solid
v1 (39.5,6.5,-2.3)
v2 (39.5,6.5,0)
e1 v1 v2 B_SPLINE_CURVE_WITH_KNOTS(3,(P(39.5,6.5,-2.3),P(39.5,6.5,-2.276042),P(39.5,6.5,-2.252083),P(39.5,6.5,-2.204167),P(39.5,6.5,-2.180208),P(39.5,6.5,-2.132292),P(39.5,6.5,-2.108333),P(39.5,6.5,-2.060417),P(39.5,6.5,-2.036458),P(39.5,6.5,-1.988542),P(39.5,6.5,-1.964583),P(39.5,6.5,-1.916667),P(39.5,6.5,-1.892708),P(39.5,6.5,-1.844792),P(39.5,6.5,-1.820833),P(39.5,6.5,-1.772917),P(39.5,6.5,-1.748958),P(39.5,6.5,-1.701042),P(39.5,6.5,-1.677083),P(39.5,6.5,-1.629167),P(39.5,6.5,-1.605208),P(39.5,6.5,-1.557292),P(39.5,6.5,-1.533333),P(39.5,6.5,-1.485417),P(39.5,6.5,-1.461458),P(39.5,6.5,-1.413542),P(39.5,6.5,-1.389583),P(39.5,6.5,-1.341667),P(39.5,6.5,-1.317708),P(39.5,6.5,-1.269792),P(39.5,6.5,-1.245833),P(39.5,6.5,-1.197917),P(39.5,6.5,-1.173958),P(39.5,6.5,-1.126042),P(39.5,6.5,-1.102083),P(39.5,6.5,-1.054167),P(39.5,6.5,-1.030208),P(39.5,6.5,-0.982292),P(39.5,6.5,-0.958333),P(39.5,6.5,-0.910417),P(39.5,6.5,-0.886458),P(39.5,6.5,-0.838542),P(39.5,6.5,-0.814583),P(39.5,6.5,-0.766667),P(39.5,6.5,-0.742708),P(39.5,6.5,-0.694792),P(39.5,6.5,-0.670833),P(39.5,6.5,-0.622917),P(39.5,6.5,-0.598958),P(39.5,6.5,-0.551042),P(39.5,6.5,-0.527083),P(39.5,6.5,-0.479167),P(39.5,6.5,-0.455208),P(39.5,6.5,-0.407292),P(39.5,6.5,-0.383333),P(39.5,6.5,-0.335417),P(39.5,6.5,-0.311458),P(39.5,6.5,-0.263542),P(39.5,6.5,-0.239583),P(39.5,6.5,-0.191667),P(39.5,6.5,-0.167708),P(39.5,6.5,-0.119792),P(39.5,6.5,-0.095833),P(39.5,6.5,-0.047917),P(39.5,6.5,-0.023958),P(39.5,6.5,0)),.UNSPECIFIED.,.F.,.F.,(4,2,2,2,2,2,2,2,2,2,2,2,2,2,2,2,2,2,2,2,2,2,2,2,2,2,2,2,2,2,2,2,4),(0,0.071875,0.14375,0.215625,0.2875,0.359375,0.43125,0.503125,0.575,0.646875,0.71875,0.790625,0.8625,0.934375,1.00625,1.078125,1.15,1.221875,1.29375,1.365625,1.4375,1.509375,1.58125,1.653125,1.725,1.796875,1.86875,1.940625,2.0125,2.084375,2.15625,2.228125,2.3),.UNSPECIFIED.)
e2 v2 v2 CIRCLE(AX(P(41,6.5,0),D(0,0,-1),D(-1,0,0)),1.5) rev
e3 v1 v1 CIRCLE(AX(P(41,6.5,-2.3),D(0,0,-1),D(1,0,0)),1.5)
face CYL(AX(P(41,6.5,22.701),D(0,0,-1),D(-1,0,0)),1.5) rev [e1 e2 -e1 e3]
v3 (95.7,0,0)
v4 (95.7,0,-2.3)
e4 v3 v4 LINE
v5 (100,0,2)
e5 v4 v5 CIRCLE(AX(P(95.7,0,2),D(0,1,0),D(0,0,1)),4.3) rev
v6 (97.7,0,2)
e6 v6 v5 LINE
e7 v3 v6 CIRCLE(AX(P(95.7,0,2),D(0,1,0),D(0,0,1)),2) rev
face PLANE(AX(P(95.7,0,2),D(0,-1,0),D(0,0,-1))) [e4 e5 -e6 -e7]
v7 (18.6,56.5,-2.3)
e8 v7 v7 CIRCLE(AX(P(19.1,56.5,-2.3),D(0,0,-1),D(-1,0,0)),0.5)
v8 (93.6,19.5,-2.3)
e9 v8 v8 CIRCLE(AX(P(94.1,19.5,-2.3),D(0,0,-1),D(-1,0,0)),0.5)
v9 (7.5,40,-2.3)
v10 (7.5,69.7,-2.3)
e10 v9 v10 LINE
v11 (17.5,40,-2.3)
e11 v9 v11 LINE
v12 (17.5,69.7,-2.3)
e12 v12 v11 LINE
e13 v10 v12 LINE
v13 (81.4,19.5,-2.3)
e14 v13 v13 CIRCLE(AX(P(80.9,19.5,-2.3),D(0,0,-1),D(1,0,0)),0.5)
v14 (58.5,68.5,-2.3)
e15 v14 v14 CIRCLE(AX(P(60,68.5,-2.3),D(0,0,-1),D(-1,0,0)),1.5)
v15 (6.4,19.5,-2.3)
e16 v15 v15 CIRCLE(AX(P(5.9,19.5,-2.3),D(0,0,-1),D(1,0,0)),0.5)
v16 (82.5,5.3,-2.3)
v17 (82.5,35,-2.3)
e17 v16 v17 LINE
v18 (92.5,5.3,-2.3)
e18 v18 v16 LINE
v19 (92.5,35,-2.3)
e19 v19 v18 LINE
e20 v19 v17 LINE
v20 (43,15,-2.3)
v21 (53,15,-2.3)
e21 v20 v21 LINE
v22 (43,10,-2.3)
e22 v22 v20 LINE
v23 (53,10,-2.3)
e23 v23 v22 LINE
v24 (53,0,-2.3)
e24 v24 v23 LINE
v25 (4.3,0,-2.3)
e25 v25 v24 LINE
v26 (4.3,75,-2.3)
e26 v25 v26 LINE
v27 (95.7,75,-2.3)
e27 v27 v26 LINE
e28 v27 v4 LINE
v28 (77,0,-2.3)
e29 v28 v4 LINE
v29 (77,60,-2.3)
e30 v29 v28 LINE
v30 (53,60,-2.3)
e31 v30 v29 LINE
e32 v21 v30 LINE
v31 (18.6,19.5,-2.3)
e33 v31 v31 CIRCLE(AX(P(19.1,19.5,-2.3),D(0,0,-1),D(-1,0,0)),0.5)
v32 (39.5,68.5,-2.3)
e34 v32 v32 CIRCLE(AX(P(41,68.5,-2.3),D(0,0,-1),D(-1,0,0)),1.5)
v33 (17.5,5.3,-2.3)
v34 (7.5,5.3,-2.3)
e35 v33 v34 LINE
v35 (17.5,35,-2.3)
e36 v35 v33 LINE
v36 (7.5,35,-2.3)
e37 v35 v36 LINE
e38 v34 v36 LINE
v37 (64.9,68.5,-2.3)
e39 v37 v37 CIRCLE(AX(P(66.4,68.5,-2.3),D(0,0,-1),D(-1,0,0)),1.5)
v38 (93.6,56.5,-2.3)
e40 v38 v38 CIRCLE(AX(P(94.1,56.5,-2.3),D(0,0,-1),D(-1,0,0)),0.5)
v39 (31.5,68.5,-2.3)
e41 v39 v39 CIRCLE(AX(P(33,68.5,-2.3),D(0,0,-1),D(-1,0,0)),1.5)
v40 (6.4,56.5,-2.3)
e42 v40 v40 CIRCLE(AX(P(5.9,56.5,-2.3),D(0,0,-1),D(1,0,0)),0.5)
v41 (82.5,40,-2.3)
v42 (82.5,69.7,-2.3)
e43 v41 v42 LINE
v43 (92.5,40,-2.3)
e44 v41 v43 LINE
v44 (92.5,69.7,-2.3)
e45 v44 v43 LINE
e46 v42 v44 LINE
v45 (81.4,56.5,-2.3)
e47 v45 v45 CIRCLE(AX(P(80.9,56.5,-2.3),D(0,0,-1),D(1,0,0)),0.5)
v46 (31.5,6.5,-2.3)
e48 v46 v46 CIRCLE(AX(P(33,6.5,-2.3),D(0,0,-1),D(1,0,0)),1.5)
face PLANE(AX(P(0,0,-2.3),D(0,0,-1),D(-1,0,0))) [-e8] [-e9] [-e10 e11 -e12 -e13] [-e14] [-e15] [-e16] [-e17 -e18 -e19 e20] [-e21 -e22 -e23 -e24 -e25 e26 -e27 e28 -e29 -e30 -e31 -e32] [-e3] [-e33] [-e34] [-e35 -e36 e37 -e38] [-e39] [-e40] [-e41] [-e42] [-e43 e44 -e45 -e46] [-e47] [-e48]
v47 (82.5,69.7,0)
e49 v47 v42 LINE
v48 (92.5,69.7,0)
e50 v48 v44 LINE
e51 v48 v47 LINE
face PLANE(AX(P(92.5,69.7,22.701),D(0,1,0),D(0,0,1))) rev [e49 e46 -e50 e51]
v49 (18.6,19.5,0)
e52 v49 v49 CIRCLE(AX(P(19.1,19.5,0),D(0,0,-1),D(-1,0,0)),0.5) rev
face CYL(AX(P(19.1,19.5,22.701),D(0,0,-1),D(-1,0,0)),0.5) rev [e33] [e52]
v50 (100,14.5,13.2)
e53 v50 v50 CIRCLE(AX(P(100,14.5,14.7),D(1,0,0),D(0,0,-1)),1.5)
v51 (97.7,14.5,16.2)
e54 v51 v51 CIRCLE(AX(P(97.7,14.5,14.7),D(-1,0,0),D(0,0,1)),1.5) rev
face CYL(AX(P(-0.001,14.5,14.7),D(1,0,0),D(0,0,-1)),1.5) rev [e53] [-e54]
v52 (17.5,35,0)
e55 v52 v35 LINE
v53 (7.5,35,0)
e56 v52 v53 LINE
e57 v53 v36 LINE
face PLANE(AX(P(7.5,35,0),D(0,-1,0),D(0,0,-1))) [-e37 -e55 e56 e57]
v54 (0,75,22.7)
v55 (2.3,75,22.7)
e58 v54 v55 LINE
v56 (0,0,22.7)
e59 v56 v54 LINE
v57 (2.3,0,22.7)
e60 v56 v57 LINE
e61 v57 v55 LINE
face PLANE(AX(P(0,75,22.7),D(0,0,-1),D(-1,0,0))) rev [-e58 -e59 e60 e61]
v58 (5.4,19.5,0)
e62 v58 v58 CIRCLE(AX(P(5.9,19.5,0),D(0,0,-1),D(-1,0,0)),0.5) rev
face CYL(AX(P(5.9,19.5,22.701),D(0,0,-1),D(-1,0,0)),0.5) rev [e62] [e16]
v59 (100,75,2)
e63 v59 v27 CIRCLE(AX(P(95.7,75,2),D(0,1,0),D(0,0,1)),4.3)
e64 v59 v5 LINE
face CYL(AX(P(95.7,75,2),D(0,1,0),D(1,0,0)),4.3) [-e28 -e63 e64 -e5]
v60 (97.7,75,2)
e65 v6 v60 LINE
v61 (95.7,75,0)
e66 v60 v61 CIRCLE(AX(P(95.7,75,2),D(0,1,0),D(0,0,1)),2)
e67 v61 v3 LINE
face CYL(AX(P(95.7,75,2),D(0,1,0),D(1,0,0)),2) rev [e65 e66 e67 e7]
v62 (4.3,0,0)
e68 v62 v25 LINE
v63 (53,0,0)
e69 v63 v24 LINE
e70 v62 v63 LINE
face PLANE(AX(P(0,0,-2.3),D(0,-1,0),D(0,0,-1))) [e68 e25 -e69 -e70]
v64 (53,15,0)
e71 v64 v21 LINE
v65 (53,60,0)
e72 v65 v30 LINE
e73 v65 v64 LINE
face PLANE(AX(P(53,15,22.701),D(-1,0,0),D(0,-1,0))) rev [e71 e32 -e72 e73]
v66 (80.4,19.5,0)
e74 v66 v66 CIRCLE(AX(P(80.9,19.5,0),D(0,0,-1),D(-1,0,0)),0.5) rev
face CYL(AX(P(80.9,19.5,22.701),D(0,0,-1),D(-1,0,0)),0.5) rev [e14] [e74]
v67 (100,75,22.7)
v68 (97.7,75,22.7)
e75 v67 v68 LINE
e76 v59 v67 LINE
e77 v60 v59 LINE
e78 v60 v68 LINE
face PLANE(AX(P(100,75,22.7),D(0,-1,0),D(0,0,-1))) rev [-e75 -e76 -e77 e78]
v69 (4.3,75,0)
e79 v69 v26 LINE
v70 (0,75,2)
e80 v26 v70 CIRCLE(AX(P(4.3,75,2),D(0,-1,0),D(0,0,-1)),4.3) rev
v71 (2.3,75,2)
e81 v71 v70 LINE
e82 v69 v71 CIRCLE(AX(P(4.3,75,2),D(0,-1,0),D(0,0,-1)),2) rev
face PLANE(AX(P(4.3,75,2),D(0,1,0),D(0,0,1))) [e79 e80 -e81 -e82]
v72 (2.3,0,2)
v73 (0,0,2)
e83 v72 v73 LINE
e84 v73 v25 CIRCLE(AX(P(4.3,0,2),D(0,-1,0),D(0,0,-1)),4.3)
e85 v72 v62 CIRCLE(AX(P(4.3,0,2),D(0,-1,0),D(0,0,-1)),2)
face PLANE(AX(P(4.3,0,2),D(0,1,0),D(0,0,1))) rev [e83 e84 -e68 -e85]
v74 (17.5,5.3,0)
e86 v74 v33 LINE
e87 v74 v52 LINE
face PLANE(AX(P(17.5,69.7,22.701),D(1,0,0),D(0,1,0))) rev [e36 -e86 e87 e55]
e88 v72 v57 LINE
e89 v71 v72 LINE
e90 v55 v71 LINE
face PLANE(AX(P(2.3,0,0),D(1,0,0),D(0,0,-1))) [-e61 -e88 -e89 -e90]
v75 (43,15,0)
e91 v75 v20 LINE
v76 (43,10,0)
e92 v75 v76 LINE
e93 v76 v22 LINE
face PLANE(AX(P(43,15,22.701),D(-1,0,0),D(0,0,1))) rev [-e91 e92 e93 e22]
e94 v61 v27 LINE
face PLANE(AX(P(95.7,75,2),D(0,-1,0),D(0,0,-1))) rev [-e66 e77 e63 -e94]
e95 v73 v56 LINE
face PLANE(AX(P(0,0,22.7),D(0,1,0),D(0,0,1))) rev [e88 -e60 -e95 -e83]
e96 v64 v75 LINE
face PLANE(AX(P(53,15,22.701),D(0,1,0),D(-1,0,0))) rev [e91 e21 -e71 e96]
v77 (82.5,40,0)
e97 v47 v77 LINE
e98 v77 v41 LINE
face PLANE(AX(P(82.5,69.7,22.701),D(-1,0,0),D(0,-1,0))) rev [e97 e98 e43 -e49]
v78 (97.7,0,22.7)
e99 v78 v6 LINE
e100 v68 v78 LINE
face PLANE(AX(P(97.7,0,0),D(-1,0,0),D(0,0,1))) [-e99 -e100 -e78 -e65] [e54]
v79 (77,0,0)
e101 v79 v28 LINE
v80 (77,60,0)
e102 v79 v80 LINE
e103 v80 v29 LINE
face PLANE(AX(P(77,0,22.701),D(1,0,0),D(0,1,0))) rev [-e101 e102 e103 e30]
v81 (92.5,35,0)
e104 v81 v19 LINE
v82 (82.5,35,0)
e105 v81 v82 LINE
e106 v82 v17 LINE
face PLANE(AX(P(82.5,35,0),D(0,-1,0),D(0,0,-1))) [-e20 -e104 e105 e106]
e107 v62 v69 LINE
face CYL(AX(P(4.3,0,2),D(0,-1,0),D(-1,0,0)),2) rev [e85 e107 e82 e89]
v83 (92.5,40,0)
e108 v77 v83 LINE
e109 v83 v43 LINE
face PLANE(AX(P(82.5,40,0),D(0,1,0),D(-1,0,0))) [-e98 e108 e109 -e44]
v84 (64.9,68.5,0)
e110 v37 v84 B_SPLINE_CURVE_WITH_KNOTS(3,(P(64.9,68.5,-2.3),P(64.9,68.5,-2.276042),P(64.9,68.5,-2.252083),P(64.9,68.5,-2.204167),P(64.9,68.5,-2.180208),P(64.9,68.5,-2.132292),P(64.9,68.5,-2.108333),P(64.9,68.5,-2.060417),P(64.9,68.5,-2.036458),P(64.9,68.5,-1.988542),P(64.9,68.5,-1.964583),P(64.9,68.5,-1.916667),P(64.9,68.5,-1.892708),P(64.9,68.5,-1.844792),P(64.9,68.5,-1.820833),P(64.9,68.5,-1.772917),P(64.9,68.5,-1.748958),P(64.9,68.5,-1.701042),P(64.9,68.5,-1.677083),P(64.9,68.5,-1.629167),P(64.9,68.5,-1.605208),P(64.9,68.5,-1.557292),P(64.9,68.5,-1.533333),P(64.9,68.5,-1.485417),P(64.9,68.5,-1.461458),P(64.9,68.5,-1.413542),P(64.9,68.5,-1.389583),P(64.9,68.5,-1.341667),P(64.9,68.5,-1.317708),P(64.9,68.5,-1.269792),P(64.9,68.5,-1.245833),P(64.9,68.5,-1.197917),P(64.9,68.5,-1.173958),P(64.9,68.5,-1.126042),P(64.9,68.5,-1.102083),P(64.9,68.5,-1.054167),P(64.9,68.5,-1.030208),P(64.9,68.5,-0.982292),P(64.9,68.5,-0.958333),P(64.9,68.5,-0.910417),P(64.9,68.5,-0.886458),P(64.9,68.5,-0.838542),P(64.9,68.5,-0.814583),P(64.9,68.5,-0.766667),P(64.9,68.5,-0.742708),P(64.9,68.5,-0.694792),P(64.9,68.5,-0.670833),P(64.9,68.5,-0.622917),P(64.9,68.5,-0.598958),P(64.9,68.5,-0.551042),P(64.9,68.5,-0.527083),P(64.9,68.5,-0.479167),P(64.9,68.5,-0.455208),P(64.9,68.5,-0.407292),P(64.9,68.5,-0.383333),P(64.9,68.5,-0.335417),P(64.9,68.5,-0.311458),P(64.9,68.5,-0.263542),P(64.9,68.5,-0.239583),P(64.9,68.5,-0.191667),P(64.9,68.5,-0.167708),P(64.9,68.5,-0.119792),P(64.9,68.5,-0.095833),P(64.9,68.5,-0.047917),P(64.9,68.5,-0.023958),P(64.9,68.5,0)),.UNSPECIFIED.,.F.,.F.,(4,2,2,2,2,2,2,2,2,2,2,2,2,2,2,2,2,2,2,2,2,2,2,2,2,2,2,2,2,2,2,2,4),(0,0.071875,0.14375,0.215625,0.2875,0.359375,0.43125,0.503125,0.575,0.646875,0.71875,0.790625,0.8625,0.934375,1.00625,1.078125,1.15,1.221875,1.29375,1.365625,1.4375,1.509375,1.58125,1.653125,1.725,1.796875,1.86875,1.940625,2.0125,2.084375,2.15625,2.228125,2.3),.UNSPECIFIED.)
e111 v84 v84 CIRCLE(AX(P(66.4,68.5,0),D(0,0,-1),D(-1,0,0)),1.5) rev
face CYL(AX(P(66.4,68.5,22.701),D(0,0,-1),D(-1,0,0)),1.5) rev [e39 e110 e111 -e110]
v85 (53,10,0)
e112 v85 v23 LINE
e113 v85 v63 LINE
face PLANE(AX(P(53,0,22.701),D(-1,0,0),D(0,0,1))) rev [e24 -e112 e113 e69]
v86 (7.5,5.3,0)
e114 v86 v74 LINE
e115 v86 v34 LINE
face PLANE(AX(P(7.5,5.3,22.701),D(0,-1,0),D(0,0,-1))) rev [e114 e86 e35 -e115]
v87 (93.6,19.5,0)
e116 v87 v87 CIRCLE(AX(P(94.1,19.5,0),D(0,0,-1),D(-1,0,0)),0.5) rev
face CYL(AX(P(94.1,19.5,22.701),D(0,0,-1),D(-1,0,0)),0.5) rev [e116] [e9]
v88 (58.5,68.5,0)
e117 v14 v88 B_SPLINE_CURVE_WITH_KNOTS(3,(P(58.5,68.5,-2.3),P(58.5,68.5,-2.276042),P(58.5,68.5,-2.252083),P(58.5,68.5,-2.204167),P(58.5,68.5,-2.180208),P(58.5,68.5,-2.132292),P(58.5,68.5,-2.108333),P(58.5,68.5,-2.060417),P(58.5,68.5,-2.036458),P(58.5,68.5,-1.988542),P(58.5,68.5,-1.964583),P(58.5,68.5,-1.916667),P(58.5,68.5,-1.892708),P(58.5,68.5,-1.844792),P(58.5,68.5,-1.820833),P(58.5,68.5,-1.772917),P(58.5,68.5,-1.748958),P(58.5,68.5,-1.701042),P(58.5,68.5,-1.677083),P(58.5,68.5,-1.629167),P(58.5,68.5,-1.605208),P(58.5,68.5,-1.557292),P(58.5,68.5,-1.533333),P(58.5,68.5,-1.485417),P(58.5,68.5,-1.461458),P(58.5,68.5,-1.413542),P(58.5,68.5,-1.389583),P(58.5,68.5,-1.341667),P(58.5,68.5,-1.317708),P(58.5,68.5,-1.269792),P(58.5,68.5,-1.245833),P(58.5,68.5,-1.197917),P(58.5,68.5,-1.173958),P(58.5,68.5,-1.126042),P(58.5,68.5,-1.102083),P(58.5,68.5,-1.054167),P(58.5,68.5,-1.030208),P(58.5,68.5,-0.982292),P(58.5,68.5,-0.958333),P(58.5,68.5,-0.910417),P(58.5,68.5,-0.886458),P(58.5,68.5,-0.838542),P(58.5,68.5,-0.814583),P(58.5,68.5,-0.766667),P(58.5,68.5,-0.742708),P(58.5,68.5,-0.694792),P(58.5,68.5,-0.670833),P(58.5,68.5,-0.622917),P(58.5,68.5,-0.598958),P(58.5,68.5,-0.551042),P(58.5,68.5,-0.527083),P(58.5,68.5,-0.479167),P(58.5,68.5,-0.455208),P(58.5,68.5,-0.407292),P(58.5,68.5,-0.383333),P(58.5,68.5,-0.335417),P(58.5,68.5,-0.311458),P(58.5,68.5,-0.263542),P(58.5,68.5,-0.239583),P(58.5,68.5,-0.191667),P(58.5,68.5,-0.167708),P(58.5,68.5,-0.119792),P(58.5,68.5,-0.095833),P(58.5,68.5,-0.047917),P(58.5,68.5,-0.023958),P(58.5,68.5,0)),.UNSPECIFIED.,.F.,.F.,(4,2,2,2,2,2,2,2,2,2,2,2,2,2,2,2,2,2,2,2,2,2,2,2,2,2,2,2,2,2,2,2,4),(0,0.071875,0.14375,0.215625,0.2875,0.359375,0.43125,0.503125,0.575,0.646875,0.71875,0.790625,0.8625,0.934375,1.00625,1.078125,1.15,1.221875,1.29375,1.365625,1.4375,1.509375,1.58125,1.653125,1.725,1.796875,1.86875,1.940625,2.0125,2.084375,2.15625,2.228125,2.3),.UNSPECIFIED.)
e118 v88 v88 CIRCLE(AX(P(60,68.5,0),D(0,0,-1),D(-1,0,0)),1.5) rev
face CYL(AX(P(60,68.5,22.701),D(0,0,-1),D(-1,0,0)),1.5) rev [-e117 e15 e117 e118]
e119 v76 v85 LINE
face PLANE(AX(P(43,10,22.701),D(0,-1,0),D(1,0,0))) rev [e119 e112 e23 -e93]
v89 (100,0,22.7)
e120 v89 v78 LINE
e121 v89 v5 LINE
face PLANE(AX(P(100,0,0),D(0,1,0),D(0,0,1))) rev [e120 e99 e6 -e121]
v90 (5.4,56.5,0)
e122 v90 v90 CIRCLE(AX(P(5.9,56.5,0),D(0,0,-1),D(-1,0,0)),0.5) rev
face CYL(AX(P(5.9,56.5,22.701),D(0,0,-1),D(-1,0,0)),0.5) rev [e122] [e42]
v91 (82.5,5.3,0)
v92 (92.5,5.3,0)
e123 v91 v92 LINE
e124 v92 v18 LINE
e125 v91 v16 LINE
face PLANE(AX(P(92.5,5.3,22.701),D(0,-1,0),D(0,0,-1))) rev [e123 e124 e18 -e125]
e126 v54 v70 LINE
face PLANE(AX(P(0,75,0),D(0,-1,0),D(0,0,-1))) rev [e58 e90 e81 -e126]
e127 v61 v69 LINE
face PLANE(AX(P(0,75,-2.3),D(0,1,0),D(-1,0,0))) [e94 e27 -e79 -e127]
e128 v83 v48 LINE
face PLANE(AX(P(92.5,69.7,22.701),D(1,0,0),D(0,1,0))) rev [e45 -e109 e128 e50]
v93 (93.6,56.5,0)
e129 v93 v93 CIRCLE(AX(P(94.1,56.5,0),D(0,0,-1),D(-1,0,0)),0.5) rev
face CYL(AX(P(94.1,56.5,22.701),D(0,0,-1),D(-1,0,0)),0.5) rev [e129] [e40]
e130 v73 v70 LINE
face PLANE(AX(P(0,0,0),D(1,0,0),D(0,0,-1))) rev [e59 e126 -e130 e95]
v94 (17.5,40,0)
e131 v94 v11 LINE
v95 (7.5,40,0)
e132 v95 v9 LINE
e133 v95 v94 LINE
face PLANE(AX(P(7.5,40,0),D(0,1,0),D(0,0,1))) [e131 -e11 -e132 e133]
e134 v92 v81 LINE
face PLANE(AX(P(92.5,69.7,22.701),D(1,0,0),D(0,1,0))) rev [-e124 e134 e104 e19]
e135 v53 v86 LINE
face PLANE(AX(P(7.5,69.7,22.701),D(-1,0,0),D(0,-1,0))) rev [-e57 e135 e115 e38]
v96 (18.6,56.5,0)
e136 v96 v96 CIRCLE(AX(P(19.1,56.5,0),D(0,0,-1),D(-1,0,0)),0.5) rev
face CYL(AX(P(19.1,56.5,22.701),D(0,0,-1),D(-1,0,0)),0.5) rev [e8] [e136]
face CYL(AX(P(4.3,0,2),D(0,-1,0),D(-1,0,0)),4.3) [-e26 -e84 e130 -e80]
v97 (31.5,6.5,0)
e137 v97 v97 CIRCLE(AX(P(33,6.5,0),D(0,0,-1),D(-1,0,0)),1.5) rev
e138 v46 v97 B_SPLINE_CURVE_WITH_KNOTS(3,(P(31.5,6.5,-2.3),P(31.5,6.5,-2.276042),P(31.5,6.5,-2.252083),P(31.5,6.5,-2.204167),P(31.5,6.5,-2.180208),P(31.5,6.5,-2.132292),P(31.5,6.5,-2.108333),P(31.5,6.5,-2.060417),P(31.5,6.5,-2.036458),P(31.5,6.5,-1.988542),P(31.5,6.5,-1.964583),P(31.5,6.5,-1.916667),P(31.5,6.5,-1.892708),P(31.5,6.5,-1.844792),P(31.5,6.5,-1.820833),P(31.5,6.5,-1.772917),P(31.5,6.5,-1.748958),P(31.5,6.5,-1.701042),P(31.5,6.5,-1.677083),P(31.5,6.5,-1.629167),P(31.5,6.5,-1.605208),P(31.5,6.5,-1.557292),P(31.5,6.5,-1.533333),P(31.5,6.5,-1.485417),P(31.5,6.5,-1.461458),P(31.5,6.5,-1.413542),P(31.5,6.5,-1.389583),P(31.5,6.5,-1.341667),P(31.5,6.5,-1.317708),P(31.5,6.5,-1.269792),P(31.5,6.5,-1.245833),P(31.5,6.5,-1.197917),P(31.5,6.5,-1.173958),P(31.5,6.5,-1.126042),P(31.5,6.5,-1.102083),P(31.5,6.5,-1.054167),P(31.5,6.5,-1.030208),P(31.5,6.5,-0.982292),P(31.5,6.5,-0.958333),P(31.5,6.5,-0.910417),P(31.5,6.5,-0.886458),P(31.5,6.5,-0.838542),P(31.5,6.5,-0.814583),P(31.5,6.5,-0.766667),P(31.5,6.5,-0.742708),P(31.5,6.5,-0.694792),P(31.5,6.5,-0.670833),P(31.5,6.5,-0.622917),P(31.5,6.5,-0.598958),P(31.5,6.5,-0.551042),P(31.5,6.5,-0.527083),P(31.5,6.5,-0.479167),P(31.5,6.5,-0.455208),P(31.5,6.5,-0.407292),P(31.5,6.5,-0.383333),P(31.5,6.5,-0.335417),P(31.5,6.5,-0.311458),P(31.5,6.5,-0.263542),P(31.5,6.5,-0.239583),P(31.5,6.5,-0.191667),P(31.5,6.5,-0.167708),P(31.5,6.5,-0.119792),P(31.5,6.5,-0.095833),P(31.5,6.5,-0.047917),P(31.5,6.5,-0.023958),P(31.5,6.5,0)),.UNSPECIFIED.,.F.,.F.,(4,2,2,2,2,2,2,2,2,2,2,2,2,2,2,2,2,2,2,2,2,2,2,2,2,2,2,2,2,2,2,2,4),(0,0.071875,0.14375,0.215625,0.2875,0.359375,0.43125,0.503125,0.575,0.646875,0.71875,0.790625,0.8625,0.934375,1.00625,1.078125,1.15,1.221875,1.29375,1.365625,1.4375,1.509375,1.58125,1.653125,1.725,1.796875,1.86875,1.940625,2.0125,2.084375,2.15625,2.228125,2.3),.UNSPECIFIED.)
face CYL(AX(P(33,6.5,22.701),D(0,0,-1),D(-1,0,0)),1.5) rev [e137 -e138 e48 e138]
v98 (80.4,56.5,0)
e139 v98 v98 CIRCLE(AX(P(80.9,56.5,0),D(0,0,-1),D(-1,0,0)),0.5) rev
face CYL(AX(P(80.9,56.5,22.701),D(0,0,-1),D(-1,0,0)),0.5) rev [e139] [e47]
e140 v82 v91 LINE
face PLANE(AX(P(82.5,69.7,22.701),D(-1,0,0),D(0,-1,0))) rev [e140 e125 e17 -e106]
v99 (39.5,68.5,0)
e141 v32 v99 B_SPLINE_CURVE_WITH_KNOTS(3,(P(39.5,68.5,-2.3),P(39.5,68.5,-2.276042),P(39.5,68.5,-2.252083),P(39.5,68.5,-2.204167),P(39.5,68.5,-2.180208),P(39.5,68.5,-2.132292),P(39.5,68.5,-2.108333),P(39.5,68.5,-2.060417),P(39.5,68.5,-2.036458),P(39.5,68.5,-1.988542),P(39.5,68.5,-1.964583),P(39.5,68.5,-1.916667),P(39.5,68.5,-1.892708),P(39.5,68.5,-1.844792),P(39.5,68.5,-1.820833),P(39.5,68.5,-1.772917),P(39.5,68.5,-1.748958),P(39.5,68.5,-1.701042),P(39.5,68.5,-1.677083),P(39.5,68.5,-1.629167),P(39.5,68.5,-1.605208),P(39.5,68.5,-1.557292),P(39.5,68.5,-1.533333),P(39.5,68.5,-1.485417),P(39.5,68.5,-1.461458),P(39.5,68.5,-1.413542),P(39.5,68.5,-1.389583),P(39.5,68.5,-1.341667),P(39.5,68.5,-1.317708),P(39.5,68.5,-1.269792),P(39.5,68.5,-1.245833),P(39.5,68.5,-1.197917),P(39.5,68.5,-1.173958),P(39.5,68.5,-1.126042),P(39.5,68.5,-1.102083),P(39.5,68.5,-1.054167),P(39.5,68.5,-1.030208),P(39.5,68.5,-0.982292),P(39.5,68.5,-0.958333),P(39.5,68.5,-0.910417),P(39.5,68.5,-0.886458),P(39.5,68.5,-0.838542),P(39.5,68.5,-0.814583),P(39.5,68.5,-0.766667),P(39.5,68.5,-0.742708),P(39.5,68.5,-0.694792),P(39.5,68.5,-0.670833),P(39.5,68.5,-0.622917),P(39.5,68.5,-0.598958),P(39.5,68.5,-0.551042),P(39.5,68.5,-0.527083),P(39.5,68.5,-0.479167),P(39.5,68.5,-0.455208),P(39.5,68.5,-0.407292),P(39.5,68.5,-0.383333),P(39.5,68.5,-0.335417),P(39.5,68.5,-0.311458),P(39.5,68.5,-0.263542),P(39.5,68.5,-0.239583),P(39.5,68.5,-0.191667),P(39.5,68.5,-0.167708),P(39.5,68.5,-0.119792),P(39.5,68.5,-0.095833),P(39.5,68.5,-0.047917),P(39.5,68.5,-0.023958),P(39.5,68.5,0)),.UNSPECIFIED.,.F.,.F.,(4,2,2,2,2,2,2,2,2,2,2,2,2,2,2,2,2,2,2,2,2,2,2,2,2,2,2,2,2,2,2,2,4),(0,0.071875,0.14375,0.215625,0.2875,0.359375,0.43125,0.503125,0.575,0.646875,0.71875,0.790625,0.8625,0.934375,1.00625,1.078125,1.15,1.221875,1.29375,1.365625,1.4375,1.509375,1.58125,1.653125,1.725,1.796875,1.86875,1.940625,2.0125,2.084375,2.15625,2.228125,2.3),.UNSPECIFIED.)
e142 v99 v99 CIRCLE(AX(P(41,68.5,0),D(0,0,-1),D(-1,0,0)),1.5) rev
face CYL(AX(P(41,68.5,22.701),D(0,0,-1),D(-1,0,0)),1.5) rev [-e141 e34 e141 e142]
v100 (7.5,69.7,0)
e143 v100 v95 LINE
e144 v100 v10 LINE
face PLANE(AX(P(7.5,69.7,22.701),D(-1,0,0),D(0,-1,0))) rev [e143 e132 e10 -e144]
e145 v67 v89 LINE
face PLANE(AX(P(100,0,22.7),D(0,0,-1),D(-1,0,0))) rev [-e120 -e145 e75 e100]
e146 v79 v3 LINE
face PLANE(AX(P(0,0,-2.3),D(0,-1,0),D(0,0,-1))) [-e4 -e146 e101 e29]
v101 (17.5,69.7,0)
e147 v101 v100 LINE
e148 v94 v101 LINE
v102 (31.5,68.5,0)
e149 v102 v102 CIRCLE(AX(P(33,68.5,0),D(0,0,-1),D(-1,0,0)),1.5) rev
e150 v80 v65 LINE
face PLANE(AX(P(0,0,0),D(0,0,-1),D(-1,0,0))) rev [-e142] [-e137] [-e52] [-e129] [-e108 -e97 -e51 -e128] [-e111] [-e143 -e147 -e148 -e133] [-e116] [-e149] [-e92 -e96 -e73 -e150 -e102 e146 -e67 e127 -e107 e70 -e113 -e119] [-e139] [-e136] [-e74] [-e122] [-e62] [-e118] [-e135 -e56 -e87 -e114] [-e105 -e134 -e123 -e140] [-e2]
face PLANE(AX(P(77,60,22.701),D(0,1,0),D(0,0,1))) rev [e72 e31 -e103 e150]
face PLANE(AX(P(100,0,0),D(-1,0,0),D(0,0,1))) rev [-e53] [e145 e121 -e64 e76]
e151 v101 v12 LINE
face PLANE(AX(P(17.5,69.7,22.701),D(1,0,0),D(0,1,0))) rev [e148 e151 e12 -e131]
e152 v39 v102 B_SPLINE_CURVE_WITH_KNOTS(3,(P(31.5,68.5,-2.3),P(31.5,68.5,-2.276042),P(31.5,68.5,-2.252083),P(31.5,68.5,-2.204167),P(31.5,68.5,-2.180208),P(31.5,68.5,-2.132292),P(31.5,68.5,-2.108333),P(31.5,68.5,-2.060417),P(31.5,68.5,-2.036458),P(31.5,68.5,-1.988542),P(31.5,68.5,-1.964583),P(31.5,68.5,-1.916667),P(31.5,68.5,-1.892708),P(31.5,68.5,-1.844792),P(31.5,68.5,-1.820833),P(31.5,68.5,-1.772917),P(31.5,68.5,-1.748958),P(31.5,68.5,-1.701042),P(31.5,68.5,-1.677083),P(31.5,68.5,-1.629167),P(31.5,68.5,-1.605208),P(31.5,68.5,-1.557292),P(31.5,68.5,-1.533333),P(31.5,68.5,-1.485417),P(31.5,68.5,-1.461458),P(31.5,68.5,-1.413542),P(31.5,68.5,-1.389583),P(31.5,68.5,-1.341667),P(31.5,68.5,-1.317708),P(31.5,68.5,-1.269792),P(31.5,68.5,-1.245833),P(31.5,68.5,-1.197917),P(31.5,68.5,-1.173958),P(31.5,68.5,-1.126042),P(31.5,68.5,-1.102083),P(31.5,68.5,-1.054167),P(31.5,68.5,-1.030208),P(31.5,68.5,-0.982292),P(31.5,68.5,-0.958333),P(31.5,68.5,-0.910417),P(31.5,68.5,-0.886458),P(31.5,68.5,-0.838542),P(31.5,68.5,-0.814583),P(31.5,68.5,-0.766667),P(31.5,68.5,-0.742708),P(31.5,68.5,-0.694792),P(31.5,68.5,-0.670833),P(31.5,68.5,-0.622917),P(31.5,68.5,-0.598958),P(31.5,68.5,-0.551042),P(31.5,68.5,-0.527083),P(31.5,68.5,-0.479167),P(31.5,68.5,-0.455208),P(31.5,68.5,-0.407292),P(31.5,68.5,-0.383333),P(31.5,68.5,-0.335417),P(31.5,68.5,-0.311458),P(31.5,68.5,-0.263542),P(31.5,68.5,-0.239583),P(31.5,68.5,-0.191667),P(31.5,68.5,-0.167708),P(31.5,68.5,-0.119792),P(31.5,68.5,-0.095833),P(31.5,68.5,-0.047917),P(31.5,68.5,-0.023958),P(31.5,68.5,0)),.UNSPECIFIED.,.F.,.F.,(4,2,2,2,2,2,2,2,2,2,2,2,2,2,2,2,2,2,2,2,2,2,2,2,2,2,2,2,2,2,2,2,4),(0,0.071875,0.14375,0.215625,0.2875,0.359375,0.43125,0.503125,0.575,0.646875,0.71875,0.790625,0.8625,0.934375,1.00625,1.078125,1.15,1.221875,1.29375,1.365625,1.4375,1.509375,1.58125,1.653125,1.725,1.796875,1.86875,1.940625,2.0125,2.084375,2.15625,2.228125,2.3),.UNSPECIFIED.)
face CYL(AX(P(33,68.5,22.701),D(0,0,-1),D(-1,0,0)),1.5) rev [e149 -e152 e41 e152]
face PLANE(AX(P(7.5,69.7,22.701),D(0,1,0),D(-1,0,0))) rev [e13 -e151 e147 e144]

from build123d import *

# Parameters (mm, degrees)
SKETCH2_W                    = 100
SKETCH2_H                    = 75
BASE_FLANGE1_DEPTH           = 2.3
EDGE_FLANGE1_STRIP_W         = 13.2
EDGE_FLANGE1_STRIP_H         = 2.3
EDGE_FLANGE1_STRIP_CUT_DEPTH = 75
EDGE_FLANGE1_DEPTH           = 75
EDGE_FLANGE2_STRIP_W         = 13.2
EDGE_FLANGE2_STRIP_H         = 2.3
EDGE_FLANGE2_STRIP_CUT_DEPTH = 75
EDGE_FLANGE2_DEPTH           = 75
CUT_EXTRUDE1_REACH           = 129.475
SKETCH13_R                   = 1.5
SKETCH13_W                   = 10
SKETCH13_H                   = 64.4
SKETCH14_W                   = 10
SKETCH14_H                   = 5
TAB1_DEPTH                   = 2.3
CUT_EXTRUDE2_REACH           = 129.475
SKETCH17_R                   = 0.5
CUT_EXTRUDE3_REACH           = 129.044
SKETCH18_R                   = 1.5


# Sheet-metal steps are written as plain solids
with BuildPart() as part:
    # Sketch2 → Base-Flange1 (new body)
    with BuildSketch(Plane.XY):
        with Locations((50, 37.5)):
            Rectangle(SKETCH2_W, SKETCH2_H)
    extrude(amount=-BASE_FLANGE1_DEPTH)

    # Edge-Flange1 strip (across the edge) → Edge-Flange1 strip cut (cut)
    with BuildSketch(Plane.XZ.offset(-75)):
        with Locations((-2.3, -1.15)):
            Rectangle(EDGE_FLANGE1_STRIP_W, EDGE_FLANGE1_STRIP_H)
    extrude(amount=EDGE_FLANGE1_STRIP_CUT_DEPTH, mode=Mode.SUBTRACT)

    # Edge-Flange1 section (across the edge) → Edge-Flange1 (add)
    with BuildSketch(Plane.XZ.offset(-75)):
        with BuildLine():
            Line((0, 2), (0, 22.7))
            Line((0, 22.7), (2.3, 22.7))
            Line((2.3, 22.7), (2.3, 2))
            ThreePointArc((2.3, 2), (2.885786438, 0.585786438), (4.3, 0))
            Line((4.3, 0), (4.3, -2.3))
            ThreePointArc((4.3, -2.3), (1.259440841, -1.040559159), (0, 2))
        make_face()
    extrude(amount=EDGE_FLANGE1_DEPTH)

    # Edge-Flange2 strip (across the edge) → Edge-Flange2 strip cut (cut)
    with BuildSketch(Plane(origin=(100, 0, 0), x_dir=(-1, 0, 0), z_dir=(0, 1, 0))):
        with Locations((-2.3, -1.15)):
            Rectangle(EDGE_FLANGE2_STRIP_W, EDGE_FLANGE2_STRIP_H)
    extrude(amount=EDGE_FLANGE2_STRIP_CUT_DEPTH, mode=Mode.SUBTRACT)

    # Edge-Flange2 section (across the edge) → Edge-Flange2 (add)
    with BuildSketch(Plane(origin=(100, 0, 0), x_dir=(-1, 0, 0), z_dir=(0, 1, 0))):
        with BuildLine():
            Line((0, 2), (0, 22.7))
            Line((0, 22.7), (2.3, 22.7))
            Line((2.3, 22.7), (2.3, 2))
            ThreePointArc((2.3, 2), (2.885786438, 0.585786438), (4.3, 0))
            Line((4.3, 0), (4.3, -2.3))
            ThreePointArc((4.3, -2.3), (1.259440841, -1.040559159), (0, 2))
        make_face()
    extrude(amount=EDGE_FLANGE2_DEPTH)

    # Sketch13 → Cut-Extrude1 (cut, up to next)
    with BuildSketch(Plane(origin=(0, 0, -2.3), x_dir=(-1, 0, 0), z_dir=(0, 0, -1)), mode=Mode.PRIVATE) as cut_extrude1_sk1:
        with Locations((-66.4, 68.5)):
            Circle(SKETCH13_R)
    cut_extrude1_tool1 = extrude(cut_extrude1_sk1.sketch, amount=-CUT_EXTRUDE1_REACH, mode=Mode.PRIVATE) & part.part
    # Sketch13 → Cut-Extrude1 (cut, up to next)
    with BuildSketch(Plane(origin=(0, 0, -2.3), x_dir=(-1, 0, 0), z_dir=(0, 0, -1)), mode=Mode.PRIVATE) as cut_extrude1_sk2:
        with Locations((-60, 68.5)):
            Circle(SKETCH13_R)
    cut_extrude1_tool2 = extrude(cut_extrude1_sk2.sketch, amount=-CUT_EXTRUDE1_REACH, mode=Mode.PRIVATE) & part.part
    # Sketch13 → Cut-Extrude1 (cut, up to next)
    with BuildSketch(Plane(origin=(0, 0, -2.3), x_dir=(-1, 0, 0), z_dir=(0, 0, -1)), mode=Mode.PRIVATE) as cut_extrude1_sk3:
        with Locations((-41, 68.5)):
            Circle(SKETCH13_R)
    cut_extrude1_tool3 = extrude(cut_extrude1_sk3.sketch, amount=-CUT_EXTRUDE1_REACH, mode=Mode.PRIVATE) & part.part
    # Sketch13 → Cut-Extrude1 (cut, up to next)
    with BuildSketch(Plane(origin=(0, 0, -2.3), x_dir=(-1, 0, 0), z_dir=(0, 0, -1)), mode=Mode.PRIVATE) as cut_extrude1_sk4:
        with Locations((-33, 68.5)):
            Circle(SKETCH13_R)
    cut_extrude1_tool4 = extrude(cut_extrude1_sk4.sketch, amount=-CUT_EXTRUDE1_REACH, mode=Mode.PRIVATE) & part.part
    # Sketch13 → Cut-Extrude1 (cut, up to next)
    with BuildSketch(Plane(origin=(0, 0, -2.3), x_dir=(-1, 0, 0), z_dir=(0, 0, -1)), mode=Mode.PRIVATE) as cut_extrude1_sk5:
        with Locations((-41, 6.5)):
            Circle(SKETCH13_R)
    cut_extrude1_tool5 = extrude(cut_extrude1_sk5.sketch, amount=-CUT_EXTRUDE1_REACH, mode=Mode.PRIVATE) & part.part
    # Sketch13 → Cut-Extrude1 (cut, up to next)
    with BuildSketch(Plane(origin=(0, 0, -2.3), x_dir=(-1, 0, 0), z_dir=(0, 0, -1)), mode=Mode.PRIVATE) as cut_extrude1_sk6:
        with Locations((-33, 6.5)):
            Circle(SKETCH13_R)
    cut_extrude1_tool6 = extrude(cut_extrude1_sk6.sketch, amount=-CUT_EXTRUDE1_REACH, mode=Mode.PRIVATE) & part.part
    # Sketch13 → Cut-Extrude1 (cut, up to next)
    with BuildSketch(Plane(origin=(0, 0, -2.3), x_dir=(-1, 0, 0), z_dir=(0, 0, -1)), mode=Mode.PRIVATE) as cut_extrude1_sk7:
        Polygon((-77, 0), (-53, 0), (-53, 10), (-43, 10), (-43, 15), (-53, 15), (-53, 60), (-77, 60), align=None)
    cut_extrude1_tool7 = extrude(cut_extrude1_sk7.sketch, amount=-CUT_EXTRUDE1_REACH, mode=Mode.PRIVATE) & part.part
    # Sketch13 → Cut-Extrude1 (cut, up to next)
    with BuildSketch(Plane(origin=(0, 0, -2.3), x_dir=(-1, 0, 0), z_dir=(0, 0, -1)), mode=Mode.PRIVATE) as cut_extrude1_sk8:
        with Locations((-87.5, 37.5)):
            Rectangle(SKETCH13_W, SKETCH13_H)
    cut_extrude1_tool8 = extrude(cut_extrude1_sk8.sketch, amount=-CUT_EXTRUDE1_REACH, mode=Mode.PRIVATE) & part.part
    # Sketch13 → Cut-Extrude1 (cut, up to next)
    with BuildSketch(Plane(origin=(0, 0, -2.3), x_dir=(-1, 0, 0), z_dir=(0, 0, -1)), mode=Mode.PRIVATE) as cut_extrude1_sk9:
        with Locations((-12.5, 37.5)):
            Rectangle(SKETCH13_W, SKETCH13_H)
    cut_extrude1_tool9 = extrude(cut_extrude1_sk9.sketch, amount=-CUT_EXTRUDE1_REACH, mode=Mode.PRIVATE) & part.part
    add(cut_extrude1_tool1.solids().sort_by_distance((66.4, 68.5, -2.3))[0], mode=Mode.SUBTRACT)
    add(cut_extrude1_tool2.solids().sort_by_distance((60, 68.5, -2.3))[0], mode=Mode.SUBTRACT)
    add(cut_extrude1_tool3.solids().sort_by_distance((41, 68.5, -2.3))[0], mode=Mode.SUBTRACT)
    add(cut_extrude1_tool4.solids().sort_by_distance((33, 68.5, -2.3))[0], mode=Mode.SUBTRACT)
    add(cut_extrude1_tool5.solids().sort_by_distance((41, 6.5, -2.3))[0], mode=Mode.SUBTRACT)
    add(cut_extrude1_tool6.solids().sort_by_distance((33, 6.5, -2.3))[0], mode=Mode.SUBTRACT)
    add(cut_extrude1_tool7.solids().sort_by_distance((64.42953, 29.412752, -2.3))[0], mode=Mode.SUBTRACT)
    add(cut_extrude1_tool8.solids().sort_by_distance((87.5, 37.5, -2.3))[0], mode=Mode.SUBTRACT)
    add(cut_extrude1_tool9.solids().sort_by_distance((12.5, 37.5, -2.3))[0], mode=Mode.SUBTRACT)

    # Sketch14 → Tab1 (add)
    with BuildSketch(Plane(origin=(0, 0, -2.3), x_dir=(-1, 0, 0), z_dir=(0, 0, -1))):
        with Locations((-87.5, 37.5)):
            Rectangle(SKETCH14_W, SKETCH14_H)
        with Locations((-12.5, 37.5)):
            Rectangle(SKETCH14_W, SKETCH14_H)
    extrude(amount=-TAB1_DEPTH)

    # Sketch17 → Cut-Extrude2 (cut, up to next)
    with BuildSketch(Plane(origin=(0, 0, -2.3), x_dir=(-1, 0, 0), z_dir=(0, 0, -1)), mode=Mode.PRIVATE) as cut_extrude2_sk1:
        with Locations((-94.1, 56.5)):
            Circle(SKETCH17_R)
    cut_extrude2_tool1 = extrude(cut_extrude2_sk1.sketch, amount=-CUT_EXTRUDE2_REACH, mode=Mode.PRIVATE) & part.part
    # Sketch17 → Cut-Extrude2 (cut, up to next)
    with BuildSketch(Plane(origin=(0, 0, -2.3), x_dir=(-1, 0, 0), z_dir=(0, 0, -1)), mode=Mode.PRIVATE) as cut_extrude2_sk2:
        with Locations((-94.1, 19.5)):
            Circle(SKETCH17_R)
    cut_extrude2_tool2 = extrude(cut_extrude2_sk2.sketch, amount=-CUT_EXTRUDE2_REACH, mode=Mode.PRIVATE) & part.part
    # Sketch17 → Cut-Extrude2 (cut, up to next)
    with BuildSketch(Plane(origin=(0, 0, -2.3), x_dir=(-1, 0, 0), z_dir=(0, 0, -1)), mode=Mode.PRIVATE) as cut_extrude2_sk3:
        with Locations((-80.9, 19.5)):
            Circle(SKETCH17_R)
    cut_extrude2_tool3 = extrude(cut_extrude2_sk3.sketch, amount=-CUT_EXTRUDE2_REACH, mode=Mode.PRIVATE) & part.part
    # Sketch17 → Cut-Extrude2 (cut, up to next)
    with BuildSketch(Plane(origin=(0, 0, -2.3), x_dir=(-1, 0, 0), z_dir=(0, 0, -1)), mode=Mode.PRIVATE) as cut_extrude2_sk4:
        with Locations((-80.9, 56.5)):
            Circle(SKETCH17_R)
    cut_extrude2_tool4 = extrude(cut_extrude2_sk4.sketch, amount=-CUT_EXTRUDE2_REACH, mode=Mode.PRIVATE) & part.part
    # Sketch17 → Cut-Extrude2 (cut, up to next)
    with BuildSketch(Plane(origin=(0, 0, -2.3), x_dir=(-1, 0, 0), z_dir=(0, 0, -1)), mode=Mode.PRIVATE) as cut_extrude2_sk5:
        with Locations((-19.1, 19.5)):
            Circle(SKETCH17_R)
    cut_extrude2_tool5 = extrude(cut_extrude2_sk5.sketch, amount=-CUT_EXTRUDE2_REACH, mode=Mode.PRIVATE) & part.part
    # Sketch17 → Cut-Extrude2 (cut, up to next)
    with BuildSketch(Plane(origin=(0, 0, -2.3), x_dir=(-1, 0, 0), z_dir=(0, 0, -1)), mode=Mode.PRIVATE) as cut_extrude2_sk6:
        with Locations((-5.9, 19.5)):
            Circle(SKETCH17_R)
    cut_extrude2_tool6 = extrude(cut_extrude2_sk6.sketch, amount=-CUT_EXTRUDE2_REACH, mode=Mode.PRIVATE) & part.part
    # Sketch17 → Cut-Extrude2 (cut, up to next)
    with BuildSketch(Plane(origin=(0, 0, -2.3), x_dir=(-1, 0, 0), z_dir=(0, 0, -1)), mode=Mode.PRIVATE) as cut_extrude2_sk7:
        with Locations((-5.9, 56.5)):
            Circle(SKETCH17_R)
    cut_extrude2_tool7 = extrude(cut_extrude2_sk7.sketch, amount=-CUT_EXTRUDE2_REACH, mode=Mode.PRIVATE) & part.part
    # Sketch17 → Cut-Extrude2 (cut, up to next)
    with BuildSketch(Plane(origin=(0, 0, -2.3), x_dir=(-1, 0, 0), z_dir=(0, 0, -1)), mode=Mode.PRIVATE) as cut_extrude2_sk8:
        with Locations((-19.1, 56.5)):
            Circle(SKETCH17_R)
    cut_extrude2_tool8 = extrude(cut_extrude2_sk8.sketch, amount=-CUT_EXTRUDE2_REACH, mode=Mode.PRIVATE) & part.part
    add(cut_extrude2_tool1.solids().sort_by_distance((94.1, 56.5, -2.3))[0], mode=Mode.SUBTRACT)
    add(cut_extrude2_tool2.solids().sort_by_distance((94.1, 19.5, -2.3))[0], mode=Mode.SUBTRACT)
    add(cut_extrude2_tool3.solids().sort_by_distance((80.9, 19.5, -2.3))[0], mode=Mode.SUBTRACT)
    add(cut_extrude2_tool4.solids().sort_by_distance((80.9, 56.5, -2.3))[0], mode=Mode.SUBTRACT)
    add(cut_extrude2_tool5.solids().sort_by_distance((19.1, 19.5, -2.3))[0], mode=Mode.SUBTRACT)
    add(cut_extrude2_tool6.solids().sort_by_distance((5.9, 19.5, -2.3))[0], mode=Mode.SUBTRACT)
    add(cut_extrude2_tool7.solids().sort_by_distance((5.9, 56.5, -2.3))[0], mode=Mode.SUBTRACT)
    add(cut_extrude2_tool8.solids().sort_by_distance((19.1, 56.5, -2.3))[0], mode=Mode.SUBTRACT)

    # Sketch18 → Cut-Extrude3 (cut, up to next)
    with BuildSketch(Plane(origin=(100, 0, 0), x_dir=(0, 0, -1), z_dir=(1, 0, 0)), mode=Mode.PRIVATE) as cut_extrude3_sk1:
        with Locations((-14.7, 14.5)):
            Circle(SKETCH18_R)
    cut_extrude3_tool1 = extrude(cut_extrude3_sk1.sketch, amount=-CUT_EXTRUDE3_REACH, mode=Mode.PRIVATE) & part.part
    add(cut_extrude3_tool1.solids().sort_by_distance((100, 14.5, 14.7))[0], mode=Mode.SUBTRACT)


solid = part.part
